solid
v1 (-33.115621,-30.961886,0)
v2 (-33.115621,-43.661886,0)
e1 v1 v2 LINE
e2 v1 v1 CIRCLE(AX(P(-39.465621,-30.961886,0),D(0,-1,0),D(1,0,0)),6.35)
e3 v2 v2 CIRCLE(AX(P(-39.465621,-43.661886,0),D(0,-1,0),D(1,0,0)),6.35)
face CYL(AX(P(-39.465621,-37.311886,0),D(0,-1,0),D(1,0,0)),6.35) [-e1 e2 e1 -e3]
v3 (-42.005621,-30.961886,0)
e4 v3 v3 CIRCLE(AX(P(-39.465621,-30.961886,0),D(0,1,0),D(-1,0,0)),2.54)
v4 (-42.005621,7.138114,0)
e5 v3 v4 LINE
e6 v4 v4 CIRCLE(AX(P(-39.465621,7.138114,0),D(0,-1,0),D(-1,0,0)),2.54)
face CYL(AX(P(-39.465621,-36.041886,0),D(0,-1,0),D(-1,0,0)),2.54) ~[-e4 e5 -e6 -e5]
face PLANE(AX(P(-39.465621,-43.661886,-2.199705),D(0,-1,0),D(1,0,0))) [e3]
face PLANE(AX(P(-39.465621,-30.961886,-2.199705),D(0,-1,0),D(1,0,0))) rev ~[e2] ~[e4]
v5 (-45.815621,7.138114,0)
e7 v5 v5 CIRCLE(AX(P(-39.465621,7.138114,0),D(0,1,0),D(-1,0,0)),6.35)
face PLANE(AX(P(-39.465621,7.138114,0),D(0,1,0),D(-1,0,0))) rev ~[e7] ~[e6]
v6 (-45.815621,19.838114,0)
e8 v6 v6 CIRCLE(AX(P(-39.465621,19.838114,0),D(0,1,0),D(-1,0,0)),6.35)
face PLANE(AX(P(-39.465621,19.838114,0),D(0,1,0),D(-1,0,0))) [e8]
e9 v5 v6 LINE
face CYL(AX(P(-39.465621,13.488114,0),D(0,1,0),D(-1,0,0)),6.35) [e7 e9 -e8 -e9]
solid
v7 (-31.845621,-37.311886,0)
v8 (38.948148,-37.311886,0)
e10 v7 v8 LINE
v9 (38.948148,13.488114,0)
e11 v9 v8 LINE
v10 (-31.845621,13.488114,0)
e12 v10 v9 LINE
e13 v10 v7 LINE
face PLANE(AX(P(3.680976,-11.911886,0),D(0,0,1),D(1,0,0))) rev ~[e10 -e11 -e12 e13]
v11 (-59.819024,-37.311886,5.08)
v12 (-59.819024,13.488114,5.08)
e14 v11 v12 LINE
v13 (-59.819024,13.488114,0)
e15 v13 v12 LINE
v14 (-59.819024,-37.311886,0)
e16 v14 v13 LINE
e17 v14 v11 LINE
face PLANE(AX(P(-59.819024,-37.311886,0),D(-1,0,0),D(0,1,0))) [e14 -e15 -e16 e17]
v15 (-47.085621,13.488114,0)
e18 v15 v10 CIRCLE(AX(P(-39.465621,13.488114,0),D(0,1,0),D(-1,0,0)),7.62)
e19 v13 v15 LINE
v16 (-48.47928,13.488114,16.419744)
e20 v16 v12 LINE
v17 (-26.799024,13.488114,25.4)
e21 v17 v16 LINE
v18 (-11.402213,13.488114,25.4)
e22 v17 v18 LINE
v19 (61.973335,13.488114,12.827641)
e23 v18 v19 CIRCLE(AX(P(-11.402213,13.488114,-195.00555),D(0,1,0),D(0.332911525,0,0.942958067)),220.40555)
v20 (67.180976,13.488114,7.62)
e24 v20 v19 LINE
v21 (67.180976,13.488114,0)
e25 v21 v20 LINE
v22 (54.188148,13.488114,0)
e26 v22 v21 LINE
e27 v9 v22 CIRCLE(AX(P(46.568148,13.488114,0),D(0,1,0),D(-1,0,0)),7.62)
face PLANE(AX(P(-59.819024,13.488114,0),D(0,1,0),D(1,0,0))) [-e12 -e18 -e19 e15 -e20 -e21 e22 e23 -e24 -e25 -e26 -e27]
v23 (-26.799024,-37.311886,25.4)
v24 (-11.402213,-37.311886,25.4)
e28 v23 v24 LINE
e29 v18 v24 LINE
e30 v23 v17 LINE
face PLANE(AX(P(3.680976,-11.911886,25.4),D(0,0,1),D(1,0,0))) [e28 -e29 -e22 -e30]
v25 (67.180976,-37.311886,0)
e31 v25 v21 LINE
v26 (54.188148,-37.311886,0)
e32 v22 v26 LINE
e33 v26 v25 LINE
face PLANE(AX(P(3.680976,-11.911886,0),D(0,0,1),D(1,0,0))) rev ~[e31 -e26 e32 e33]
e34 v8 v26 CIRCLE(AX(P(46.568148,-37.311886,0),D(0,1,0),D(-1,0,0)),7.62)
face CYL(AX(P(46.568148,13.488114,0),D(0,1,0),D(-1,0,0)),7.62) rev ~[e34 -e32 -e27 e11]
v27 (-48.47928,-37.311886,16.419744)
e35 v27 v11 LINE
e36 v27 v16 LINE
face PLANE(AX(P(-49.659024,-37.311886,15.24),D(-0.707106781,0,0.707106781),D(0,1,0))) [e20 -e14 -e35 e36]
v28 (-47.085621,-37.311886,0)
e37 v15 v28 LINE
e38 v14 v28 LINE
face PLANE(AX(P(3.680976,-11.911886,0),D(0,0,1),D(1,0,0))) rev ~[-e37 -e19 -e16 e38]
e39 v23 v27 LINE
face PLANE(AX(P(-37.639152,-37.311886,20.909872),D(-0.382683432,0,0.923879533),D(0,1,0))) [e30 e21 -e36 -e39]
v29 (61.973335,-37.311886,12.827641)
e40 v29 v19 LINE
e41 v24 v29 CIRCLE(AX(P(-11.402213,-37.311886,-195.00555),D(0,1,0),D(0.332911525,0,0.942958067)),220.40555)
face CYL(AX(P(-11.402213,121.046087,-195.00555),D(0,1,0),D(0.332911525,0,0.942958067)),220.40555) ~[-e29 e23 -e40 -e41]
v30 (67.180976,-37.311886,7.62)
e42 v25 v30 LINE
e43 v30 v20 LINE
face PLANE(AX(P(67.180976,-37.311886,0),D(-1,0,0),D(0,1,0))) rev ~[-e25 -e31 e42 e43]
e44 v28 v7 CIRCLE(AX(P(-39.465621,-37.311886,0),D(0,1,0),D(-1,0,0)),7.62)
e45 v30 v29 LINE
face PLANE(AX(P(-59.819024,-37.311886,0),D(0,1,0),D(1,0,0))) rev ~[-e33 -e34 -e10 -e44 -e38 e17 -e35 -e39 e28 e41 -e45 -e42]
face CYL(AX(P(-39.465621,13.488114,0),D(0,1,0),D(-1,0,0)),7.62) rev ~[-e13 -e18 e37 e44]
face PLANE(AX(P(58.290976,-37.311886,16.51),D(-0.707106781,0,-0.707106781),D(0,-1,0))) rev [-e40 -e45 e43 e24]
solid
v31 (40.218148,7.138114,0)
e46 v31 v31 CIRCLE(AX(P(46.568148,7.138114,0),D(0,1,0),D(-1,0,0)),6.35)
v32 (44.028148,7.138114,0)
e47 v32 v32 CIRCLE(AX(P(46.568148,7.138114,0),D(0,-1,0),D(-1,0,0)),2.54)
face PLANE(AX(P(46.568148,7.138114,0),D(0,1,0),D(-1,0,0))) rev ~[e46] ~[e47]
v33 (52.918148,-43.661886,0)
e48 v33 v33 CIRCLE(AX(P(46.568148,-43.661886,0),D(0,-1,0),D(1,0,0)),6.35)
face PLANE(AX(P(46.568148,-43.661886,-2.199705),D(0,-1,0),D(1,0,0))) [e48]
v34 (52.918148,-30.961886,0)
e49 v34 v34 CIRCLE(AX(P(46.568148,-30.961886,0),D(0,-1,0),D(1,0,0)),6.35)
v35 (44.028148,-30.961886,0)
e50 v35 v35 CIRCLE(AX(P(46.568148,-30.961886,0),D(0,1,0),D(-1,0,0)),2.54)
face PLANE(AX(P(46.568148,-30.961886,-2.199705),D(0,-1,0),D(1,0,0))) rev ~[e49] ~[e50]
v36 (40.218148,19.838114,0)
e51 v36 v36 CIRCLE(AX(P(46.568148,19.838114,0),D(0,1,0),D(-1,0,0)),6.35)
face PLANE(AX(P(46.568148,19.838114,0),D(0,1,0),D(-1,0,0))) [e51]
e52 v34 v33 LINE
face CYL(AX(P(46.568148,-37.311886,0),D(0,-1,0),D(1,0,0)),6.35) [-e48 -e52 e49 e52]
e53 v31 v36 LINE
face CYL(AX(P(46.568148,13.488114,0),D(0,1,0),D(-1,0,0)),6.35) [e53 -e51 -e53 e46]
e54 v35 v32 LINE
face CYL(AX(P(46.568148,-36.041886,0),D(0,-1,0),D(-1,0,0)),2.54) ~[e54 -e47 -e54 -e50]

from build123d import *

# Parameters (mm, degrees)
F0_W        = 127
F0_H        = 50.8
F1_DEPTH    = 25.4
F2_SIZE     = 17.78
F3_SIZE     = 17.78
F4_T1_DEPTH = 265.915946003
F5_SIZE     = 20.32
F6_SIZE     = 12.7
F9_DEPTH    = 64.008
F10_DEPTH   = 80.264
F11_DEPTH   = 6.35
F12_R       = 2.54
F13_DEPTH   = 5.08
F15_DEPTH   = 108.712
F16_DEPTH   = 6.35
F17_R       = 2.54
F18_DEPTH   = 5.08
F19_R       = 6.35
F19_R_2     = 2.54
F20_DEPTH   = 6.35
F21_R       = 2.54
F22_DEPTH   = 5.08
F23_DEPTH   = 48.26


# Not quite as in the source:
# - a fillet or chamfer that OpenCascade refuses, or shapes differently, is made with other operations: its cross-section is extruded or revolved along the edge and cut away or added


with BuildPart() as f1:
    # F0 (on Top) → F1 (new body)
    with BuildSketch(Plane.XY):
        with Locations((3.6809762716, -11.9118855059)):
            Rectangle(F0_W, F0_H)
    extrude(amount=F1_DEPTH)

    # F2
    f2_edges = [f1.edges().sort_by_distance(p)[0] for p in [
        (67.180976, -11.911886, 25.4),
    ]]
    chamfer(f2_edges, length=F2_SIZE)

    # F3
    f3_edges = [f1.edges().sort_by_distance(p)[0] for p in [
        (49.400976, -11.911886, 25.4),
    ]]
    chamfer(f3_edges, length=F3_SIZE)

    # F4: fillet of radius 220.4055499979 on 1 edges, made by hand

    # F4_s2 → F4_t1 (cut)
    with BuildSketch(Plane.XZ.offset(-121.0460874956)):
        with BuildLine():
            ThreePointArc((61.9733348411, 12.8276414305), (25.8202104559, 22.2341739644), (-11.402212929, 25.4))
            Line((-11.402212929, 25.4), (31.6209762716, 25.4))
            Line((31.6209762716, 25.4), (61.9733348411, 12.8276414305))
        make_face()
    extrude(amount=F4_T1_DEPTH, mode=Mode.SUBTRACT)

    # F5
    f5_edges = [f1.edges().sort_by_distance(p)[0] for p in [
        (-59.819024, -11.911886, 25.4),
    ]]
    chamfer(f5_edges, length=F5_SIZE)

    # F6
    f6_edges = [f1.edges().sort_by_distance(p)[0] for p in [
        (-39.499024, -11.911886, 25.4),
    ]]
    chamfer(f6_edges, length=F6_SIZE)

    # F8 (on face) → F9 (cut)
    with BuildSketch(Plane(origin=(0, 13.4881144941, 0), x_dir=(-1, 0, 0), z_dir=(0, 1, 0))):
        with BuildLine():
            ThreePointArc((-52.9181478381, 0), (-46.5681478381, 6.35), (-40.2181478381, 0))
            Line((-40.2181478381, 0), (-38.9481478381, 0))
            ThreePointArc((-38.9481478381, 0), (-46.5681478381, 7.62), (-54.1881478381, 0))
            Line((-54.1881478381, 0), (-52.9181478381, 0))
        make_face()
        with BuildLine():
            Line((-52.9181478381, 0), (-40.2181478381, 0))
            ThreePointArc((-40.2181478381, 0), (-46.5681478381, 6.35), (-52.9181478381, 0))
        make_face()
        with BuildLine():
            ThreePointArc((45.8156211138, 0), (39.4656211138, 6.35), (33.1156211138, 0))
            Line((33.1156211138, 0), (45.8156211138, 0))
        make_face()
        with BuildLine():
            ThreePointArc((47.0856211138, 0), (39.4656211138, 7.62), (31.8456211138, 0))
            Line((31.8456211138, 0), (33.1156211138, 0))
            ThreePointArc((33.1156211138, 0), (39.4656211138, 6.35), (45.8156211138, 0))
            Line((45.8156211138, 0), (47.0856211138, 0))
        make_face()
    extrude(amount=-F9_DEPTH, mode=Mode.SUBTRACT)

    # F7 (on face) → F10 (cut)
    with BuildSketch(Plane.XZ.offset(37.3118855059)):
        with BuildLine():
            Line((-45.8156211138, 0), (-33.1156211138, 0))
            ThreePointArc((-33.1156211138, 0), (-39.4656211138, 6.35), (-45.8156211138, 0))
        make_face()
    extrude(amount=-F10_DEPTH, mode=Mode.SUBTRACT)

    # F7 (on face) → F15 (cut)
    with BuildSketch(Plane.XZ.offset(37.3118855059)):
        with BuildLine():
            Line((52.9181478381, 0), (40.2181478381, 0))
            ThreePointArc((40.2181478381, 0), (46.5681478381, -6.35), (52.9181478381, 0))
        make_face()
    extrude(amount=-F15_DEPTH, mode=Mode.SUBTRACT)


with BuildPart() as f11:
    # F7 (on face) → F11 (new body, symmetric)
    with BuildSketch(Plane.XZ.offset(37.3118855059)):
        with BuildLine():
            ThreePointArc((-45.8156211138, 0), (-39.4656211138, -6.35), (-33.1156211138, 0))
            Line((-33.1156211138, 0), (-45.8156211138, 0))
        make_face()
        with BuildLine():
            Line((-45.8156211138, 0), (-33.1156211138, 0))
            ThreePointArc((-33.1156211138, 0), (-39.4656211138, 6.35), (-45.8156211138, 0))
        make_face()
    extrude(amount=F11_DEPTH, both=True)

    # F12 (on face) → F13 (cut)
    with BuildSketch(Plane(origin=(0, -30.9618855059, 0), x_dir=(-1, 0, 0), z_dir=(0, 1, 0))):
        with Locations((39.4656211138, 0)):
            Circle(F12_R)
    extrude(amount=-F13_DEPTH, mode=Mode.SUBTRACT)

    # F23 (add, through all): a face of the model
    f23_faces = [f11.faces().sort_by_distance(p)[0] for p in [
        (-39.4656211138, -36.0418855059, 0),
    ]]


with BuildPart() as f16:
    # F7 (on face) → F16 (new body, symmetric)
    with BuildSketch(Plane.XZ.offset(37.3118855059)):
        with BuildLine():
            Line((52.9181478381, 0), (40.2181478381, 0))
            ThreePointArc((40.2181478381, 0), (46.5681478381, -6.35), (52.9181478381, 0))
        make_face()
        with BuildLine():
            ThreePointArc((52.9181478381, 0), (46.5681478381, 6.35), (40.2181478381, 0))
            Line((40.2181478381, 0), (52.9181478381, 0))
        make_face()
    extrude(amount=F16_DEPTH, both=True)

    # F17 (on face) → F18 (cut)
    with BuildSketch(Plane(origin=(0, -30.9618855059, 0), x_dir=(-1, 0, 0), z_dir=(0, 1, 0))):
        with Locations((-46.5681478381, 0)):
            Circle(F17_R)
    extrude(amount=-F18_DEPTH, mode=Mode.SUBTRACT)

    # F23#2 (add, through all): a face of the model
    f23_2_faces = [f16.faces().sort_by_distance(p)[0] for p in [
        (46.5681478381, -36.0418855059, 0),
    ]]


with BuildPart() as f20:
    # F19 (on face) → F20 (new body, symmetric)
    with BuildSketch(Plane(origin=(0, 13.4881144941, 0), x_dir=(-1, 0, 0), z_dir=(0, 1, 0))):
        with Locations((-46.5681478381, 0)):
            Circle(F19_R)
        with Locations((-46.5681478381, 0)):
            Circle(F19_R_2, mode=Mode.SUBTRACT)
        with Locations((-46.5681478381, 0)):
            Circle(F19_R_2)
    extrude(amount=F20_DEPTH, both=True)


with BuildPart() as f20b:
    # F19 (on face) → F20, piece 2 (new body, symmetric)
    with BuildSketch(Plane(origin=(0, 13.4881144941, 0), x_dir=(-1, 0, 0), z_dir=(0, 1, 0))):
        with Locations((39.4656211138, 0)):
            Circle(F19_R)
        with Locations((39.4656211138, 0)):
            Circle(F19_R_2, mode=Mode.SUBTRACT)
        with Locations((39.4656211138, 0)):
            Circle(F19_R_2)
    extrude(amount=F20_DEPTH, both=True)


with BuildPart() as f22_tool:
    # F21 (on face) → F22 (new body)
    with BuildSketch(Plane.XZ.offset(-7.1381144941)):
        with Locations((-39.4656211138, 0)):
            Circle(F21_R)
        with Locations((46.5681478381, 0)):
            Circle(F21_R)
    extrude(amount=-F22_DEPTH)


with BuildPart() as f20_1:
    add(f20.part)

    # F22: cut by f22_tool
    add(f22_tool.part, mode=Mode.SUBTRACT)


with BuildPart() as f20b_1:
    add(f20b.part)

    # F22: cut by f22_tool
    add(f22_tool.part, mode=Mode.SUBTRACT)


with BuildPart() as f11_1:
    add(f11.part)

    add(f20b_1.part)  # F23 merges F20b
    extrude(f23_faces, amount=F23_DEPTH)


with BuildPart() as f16_1:
    add(f16.part)

    add(f20_1.part)  # F23#2 merges F20
    extrude(f23_2_faces, amount=F23_DEPTH)


solid = Compound([f1.part, f11_1.part, f16_1.part])
